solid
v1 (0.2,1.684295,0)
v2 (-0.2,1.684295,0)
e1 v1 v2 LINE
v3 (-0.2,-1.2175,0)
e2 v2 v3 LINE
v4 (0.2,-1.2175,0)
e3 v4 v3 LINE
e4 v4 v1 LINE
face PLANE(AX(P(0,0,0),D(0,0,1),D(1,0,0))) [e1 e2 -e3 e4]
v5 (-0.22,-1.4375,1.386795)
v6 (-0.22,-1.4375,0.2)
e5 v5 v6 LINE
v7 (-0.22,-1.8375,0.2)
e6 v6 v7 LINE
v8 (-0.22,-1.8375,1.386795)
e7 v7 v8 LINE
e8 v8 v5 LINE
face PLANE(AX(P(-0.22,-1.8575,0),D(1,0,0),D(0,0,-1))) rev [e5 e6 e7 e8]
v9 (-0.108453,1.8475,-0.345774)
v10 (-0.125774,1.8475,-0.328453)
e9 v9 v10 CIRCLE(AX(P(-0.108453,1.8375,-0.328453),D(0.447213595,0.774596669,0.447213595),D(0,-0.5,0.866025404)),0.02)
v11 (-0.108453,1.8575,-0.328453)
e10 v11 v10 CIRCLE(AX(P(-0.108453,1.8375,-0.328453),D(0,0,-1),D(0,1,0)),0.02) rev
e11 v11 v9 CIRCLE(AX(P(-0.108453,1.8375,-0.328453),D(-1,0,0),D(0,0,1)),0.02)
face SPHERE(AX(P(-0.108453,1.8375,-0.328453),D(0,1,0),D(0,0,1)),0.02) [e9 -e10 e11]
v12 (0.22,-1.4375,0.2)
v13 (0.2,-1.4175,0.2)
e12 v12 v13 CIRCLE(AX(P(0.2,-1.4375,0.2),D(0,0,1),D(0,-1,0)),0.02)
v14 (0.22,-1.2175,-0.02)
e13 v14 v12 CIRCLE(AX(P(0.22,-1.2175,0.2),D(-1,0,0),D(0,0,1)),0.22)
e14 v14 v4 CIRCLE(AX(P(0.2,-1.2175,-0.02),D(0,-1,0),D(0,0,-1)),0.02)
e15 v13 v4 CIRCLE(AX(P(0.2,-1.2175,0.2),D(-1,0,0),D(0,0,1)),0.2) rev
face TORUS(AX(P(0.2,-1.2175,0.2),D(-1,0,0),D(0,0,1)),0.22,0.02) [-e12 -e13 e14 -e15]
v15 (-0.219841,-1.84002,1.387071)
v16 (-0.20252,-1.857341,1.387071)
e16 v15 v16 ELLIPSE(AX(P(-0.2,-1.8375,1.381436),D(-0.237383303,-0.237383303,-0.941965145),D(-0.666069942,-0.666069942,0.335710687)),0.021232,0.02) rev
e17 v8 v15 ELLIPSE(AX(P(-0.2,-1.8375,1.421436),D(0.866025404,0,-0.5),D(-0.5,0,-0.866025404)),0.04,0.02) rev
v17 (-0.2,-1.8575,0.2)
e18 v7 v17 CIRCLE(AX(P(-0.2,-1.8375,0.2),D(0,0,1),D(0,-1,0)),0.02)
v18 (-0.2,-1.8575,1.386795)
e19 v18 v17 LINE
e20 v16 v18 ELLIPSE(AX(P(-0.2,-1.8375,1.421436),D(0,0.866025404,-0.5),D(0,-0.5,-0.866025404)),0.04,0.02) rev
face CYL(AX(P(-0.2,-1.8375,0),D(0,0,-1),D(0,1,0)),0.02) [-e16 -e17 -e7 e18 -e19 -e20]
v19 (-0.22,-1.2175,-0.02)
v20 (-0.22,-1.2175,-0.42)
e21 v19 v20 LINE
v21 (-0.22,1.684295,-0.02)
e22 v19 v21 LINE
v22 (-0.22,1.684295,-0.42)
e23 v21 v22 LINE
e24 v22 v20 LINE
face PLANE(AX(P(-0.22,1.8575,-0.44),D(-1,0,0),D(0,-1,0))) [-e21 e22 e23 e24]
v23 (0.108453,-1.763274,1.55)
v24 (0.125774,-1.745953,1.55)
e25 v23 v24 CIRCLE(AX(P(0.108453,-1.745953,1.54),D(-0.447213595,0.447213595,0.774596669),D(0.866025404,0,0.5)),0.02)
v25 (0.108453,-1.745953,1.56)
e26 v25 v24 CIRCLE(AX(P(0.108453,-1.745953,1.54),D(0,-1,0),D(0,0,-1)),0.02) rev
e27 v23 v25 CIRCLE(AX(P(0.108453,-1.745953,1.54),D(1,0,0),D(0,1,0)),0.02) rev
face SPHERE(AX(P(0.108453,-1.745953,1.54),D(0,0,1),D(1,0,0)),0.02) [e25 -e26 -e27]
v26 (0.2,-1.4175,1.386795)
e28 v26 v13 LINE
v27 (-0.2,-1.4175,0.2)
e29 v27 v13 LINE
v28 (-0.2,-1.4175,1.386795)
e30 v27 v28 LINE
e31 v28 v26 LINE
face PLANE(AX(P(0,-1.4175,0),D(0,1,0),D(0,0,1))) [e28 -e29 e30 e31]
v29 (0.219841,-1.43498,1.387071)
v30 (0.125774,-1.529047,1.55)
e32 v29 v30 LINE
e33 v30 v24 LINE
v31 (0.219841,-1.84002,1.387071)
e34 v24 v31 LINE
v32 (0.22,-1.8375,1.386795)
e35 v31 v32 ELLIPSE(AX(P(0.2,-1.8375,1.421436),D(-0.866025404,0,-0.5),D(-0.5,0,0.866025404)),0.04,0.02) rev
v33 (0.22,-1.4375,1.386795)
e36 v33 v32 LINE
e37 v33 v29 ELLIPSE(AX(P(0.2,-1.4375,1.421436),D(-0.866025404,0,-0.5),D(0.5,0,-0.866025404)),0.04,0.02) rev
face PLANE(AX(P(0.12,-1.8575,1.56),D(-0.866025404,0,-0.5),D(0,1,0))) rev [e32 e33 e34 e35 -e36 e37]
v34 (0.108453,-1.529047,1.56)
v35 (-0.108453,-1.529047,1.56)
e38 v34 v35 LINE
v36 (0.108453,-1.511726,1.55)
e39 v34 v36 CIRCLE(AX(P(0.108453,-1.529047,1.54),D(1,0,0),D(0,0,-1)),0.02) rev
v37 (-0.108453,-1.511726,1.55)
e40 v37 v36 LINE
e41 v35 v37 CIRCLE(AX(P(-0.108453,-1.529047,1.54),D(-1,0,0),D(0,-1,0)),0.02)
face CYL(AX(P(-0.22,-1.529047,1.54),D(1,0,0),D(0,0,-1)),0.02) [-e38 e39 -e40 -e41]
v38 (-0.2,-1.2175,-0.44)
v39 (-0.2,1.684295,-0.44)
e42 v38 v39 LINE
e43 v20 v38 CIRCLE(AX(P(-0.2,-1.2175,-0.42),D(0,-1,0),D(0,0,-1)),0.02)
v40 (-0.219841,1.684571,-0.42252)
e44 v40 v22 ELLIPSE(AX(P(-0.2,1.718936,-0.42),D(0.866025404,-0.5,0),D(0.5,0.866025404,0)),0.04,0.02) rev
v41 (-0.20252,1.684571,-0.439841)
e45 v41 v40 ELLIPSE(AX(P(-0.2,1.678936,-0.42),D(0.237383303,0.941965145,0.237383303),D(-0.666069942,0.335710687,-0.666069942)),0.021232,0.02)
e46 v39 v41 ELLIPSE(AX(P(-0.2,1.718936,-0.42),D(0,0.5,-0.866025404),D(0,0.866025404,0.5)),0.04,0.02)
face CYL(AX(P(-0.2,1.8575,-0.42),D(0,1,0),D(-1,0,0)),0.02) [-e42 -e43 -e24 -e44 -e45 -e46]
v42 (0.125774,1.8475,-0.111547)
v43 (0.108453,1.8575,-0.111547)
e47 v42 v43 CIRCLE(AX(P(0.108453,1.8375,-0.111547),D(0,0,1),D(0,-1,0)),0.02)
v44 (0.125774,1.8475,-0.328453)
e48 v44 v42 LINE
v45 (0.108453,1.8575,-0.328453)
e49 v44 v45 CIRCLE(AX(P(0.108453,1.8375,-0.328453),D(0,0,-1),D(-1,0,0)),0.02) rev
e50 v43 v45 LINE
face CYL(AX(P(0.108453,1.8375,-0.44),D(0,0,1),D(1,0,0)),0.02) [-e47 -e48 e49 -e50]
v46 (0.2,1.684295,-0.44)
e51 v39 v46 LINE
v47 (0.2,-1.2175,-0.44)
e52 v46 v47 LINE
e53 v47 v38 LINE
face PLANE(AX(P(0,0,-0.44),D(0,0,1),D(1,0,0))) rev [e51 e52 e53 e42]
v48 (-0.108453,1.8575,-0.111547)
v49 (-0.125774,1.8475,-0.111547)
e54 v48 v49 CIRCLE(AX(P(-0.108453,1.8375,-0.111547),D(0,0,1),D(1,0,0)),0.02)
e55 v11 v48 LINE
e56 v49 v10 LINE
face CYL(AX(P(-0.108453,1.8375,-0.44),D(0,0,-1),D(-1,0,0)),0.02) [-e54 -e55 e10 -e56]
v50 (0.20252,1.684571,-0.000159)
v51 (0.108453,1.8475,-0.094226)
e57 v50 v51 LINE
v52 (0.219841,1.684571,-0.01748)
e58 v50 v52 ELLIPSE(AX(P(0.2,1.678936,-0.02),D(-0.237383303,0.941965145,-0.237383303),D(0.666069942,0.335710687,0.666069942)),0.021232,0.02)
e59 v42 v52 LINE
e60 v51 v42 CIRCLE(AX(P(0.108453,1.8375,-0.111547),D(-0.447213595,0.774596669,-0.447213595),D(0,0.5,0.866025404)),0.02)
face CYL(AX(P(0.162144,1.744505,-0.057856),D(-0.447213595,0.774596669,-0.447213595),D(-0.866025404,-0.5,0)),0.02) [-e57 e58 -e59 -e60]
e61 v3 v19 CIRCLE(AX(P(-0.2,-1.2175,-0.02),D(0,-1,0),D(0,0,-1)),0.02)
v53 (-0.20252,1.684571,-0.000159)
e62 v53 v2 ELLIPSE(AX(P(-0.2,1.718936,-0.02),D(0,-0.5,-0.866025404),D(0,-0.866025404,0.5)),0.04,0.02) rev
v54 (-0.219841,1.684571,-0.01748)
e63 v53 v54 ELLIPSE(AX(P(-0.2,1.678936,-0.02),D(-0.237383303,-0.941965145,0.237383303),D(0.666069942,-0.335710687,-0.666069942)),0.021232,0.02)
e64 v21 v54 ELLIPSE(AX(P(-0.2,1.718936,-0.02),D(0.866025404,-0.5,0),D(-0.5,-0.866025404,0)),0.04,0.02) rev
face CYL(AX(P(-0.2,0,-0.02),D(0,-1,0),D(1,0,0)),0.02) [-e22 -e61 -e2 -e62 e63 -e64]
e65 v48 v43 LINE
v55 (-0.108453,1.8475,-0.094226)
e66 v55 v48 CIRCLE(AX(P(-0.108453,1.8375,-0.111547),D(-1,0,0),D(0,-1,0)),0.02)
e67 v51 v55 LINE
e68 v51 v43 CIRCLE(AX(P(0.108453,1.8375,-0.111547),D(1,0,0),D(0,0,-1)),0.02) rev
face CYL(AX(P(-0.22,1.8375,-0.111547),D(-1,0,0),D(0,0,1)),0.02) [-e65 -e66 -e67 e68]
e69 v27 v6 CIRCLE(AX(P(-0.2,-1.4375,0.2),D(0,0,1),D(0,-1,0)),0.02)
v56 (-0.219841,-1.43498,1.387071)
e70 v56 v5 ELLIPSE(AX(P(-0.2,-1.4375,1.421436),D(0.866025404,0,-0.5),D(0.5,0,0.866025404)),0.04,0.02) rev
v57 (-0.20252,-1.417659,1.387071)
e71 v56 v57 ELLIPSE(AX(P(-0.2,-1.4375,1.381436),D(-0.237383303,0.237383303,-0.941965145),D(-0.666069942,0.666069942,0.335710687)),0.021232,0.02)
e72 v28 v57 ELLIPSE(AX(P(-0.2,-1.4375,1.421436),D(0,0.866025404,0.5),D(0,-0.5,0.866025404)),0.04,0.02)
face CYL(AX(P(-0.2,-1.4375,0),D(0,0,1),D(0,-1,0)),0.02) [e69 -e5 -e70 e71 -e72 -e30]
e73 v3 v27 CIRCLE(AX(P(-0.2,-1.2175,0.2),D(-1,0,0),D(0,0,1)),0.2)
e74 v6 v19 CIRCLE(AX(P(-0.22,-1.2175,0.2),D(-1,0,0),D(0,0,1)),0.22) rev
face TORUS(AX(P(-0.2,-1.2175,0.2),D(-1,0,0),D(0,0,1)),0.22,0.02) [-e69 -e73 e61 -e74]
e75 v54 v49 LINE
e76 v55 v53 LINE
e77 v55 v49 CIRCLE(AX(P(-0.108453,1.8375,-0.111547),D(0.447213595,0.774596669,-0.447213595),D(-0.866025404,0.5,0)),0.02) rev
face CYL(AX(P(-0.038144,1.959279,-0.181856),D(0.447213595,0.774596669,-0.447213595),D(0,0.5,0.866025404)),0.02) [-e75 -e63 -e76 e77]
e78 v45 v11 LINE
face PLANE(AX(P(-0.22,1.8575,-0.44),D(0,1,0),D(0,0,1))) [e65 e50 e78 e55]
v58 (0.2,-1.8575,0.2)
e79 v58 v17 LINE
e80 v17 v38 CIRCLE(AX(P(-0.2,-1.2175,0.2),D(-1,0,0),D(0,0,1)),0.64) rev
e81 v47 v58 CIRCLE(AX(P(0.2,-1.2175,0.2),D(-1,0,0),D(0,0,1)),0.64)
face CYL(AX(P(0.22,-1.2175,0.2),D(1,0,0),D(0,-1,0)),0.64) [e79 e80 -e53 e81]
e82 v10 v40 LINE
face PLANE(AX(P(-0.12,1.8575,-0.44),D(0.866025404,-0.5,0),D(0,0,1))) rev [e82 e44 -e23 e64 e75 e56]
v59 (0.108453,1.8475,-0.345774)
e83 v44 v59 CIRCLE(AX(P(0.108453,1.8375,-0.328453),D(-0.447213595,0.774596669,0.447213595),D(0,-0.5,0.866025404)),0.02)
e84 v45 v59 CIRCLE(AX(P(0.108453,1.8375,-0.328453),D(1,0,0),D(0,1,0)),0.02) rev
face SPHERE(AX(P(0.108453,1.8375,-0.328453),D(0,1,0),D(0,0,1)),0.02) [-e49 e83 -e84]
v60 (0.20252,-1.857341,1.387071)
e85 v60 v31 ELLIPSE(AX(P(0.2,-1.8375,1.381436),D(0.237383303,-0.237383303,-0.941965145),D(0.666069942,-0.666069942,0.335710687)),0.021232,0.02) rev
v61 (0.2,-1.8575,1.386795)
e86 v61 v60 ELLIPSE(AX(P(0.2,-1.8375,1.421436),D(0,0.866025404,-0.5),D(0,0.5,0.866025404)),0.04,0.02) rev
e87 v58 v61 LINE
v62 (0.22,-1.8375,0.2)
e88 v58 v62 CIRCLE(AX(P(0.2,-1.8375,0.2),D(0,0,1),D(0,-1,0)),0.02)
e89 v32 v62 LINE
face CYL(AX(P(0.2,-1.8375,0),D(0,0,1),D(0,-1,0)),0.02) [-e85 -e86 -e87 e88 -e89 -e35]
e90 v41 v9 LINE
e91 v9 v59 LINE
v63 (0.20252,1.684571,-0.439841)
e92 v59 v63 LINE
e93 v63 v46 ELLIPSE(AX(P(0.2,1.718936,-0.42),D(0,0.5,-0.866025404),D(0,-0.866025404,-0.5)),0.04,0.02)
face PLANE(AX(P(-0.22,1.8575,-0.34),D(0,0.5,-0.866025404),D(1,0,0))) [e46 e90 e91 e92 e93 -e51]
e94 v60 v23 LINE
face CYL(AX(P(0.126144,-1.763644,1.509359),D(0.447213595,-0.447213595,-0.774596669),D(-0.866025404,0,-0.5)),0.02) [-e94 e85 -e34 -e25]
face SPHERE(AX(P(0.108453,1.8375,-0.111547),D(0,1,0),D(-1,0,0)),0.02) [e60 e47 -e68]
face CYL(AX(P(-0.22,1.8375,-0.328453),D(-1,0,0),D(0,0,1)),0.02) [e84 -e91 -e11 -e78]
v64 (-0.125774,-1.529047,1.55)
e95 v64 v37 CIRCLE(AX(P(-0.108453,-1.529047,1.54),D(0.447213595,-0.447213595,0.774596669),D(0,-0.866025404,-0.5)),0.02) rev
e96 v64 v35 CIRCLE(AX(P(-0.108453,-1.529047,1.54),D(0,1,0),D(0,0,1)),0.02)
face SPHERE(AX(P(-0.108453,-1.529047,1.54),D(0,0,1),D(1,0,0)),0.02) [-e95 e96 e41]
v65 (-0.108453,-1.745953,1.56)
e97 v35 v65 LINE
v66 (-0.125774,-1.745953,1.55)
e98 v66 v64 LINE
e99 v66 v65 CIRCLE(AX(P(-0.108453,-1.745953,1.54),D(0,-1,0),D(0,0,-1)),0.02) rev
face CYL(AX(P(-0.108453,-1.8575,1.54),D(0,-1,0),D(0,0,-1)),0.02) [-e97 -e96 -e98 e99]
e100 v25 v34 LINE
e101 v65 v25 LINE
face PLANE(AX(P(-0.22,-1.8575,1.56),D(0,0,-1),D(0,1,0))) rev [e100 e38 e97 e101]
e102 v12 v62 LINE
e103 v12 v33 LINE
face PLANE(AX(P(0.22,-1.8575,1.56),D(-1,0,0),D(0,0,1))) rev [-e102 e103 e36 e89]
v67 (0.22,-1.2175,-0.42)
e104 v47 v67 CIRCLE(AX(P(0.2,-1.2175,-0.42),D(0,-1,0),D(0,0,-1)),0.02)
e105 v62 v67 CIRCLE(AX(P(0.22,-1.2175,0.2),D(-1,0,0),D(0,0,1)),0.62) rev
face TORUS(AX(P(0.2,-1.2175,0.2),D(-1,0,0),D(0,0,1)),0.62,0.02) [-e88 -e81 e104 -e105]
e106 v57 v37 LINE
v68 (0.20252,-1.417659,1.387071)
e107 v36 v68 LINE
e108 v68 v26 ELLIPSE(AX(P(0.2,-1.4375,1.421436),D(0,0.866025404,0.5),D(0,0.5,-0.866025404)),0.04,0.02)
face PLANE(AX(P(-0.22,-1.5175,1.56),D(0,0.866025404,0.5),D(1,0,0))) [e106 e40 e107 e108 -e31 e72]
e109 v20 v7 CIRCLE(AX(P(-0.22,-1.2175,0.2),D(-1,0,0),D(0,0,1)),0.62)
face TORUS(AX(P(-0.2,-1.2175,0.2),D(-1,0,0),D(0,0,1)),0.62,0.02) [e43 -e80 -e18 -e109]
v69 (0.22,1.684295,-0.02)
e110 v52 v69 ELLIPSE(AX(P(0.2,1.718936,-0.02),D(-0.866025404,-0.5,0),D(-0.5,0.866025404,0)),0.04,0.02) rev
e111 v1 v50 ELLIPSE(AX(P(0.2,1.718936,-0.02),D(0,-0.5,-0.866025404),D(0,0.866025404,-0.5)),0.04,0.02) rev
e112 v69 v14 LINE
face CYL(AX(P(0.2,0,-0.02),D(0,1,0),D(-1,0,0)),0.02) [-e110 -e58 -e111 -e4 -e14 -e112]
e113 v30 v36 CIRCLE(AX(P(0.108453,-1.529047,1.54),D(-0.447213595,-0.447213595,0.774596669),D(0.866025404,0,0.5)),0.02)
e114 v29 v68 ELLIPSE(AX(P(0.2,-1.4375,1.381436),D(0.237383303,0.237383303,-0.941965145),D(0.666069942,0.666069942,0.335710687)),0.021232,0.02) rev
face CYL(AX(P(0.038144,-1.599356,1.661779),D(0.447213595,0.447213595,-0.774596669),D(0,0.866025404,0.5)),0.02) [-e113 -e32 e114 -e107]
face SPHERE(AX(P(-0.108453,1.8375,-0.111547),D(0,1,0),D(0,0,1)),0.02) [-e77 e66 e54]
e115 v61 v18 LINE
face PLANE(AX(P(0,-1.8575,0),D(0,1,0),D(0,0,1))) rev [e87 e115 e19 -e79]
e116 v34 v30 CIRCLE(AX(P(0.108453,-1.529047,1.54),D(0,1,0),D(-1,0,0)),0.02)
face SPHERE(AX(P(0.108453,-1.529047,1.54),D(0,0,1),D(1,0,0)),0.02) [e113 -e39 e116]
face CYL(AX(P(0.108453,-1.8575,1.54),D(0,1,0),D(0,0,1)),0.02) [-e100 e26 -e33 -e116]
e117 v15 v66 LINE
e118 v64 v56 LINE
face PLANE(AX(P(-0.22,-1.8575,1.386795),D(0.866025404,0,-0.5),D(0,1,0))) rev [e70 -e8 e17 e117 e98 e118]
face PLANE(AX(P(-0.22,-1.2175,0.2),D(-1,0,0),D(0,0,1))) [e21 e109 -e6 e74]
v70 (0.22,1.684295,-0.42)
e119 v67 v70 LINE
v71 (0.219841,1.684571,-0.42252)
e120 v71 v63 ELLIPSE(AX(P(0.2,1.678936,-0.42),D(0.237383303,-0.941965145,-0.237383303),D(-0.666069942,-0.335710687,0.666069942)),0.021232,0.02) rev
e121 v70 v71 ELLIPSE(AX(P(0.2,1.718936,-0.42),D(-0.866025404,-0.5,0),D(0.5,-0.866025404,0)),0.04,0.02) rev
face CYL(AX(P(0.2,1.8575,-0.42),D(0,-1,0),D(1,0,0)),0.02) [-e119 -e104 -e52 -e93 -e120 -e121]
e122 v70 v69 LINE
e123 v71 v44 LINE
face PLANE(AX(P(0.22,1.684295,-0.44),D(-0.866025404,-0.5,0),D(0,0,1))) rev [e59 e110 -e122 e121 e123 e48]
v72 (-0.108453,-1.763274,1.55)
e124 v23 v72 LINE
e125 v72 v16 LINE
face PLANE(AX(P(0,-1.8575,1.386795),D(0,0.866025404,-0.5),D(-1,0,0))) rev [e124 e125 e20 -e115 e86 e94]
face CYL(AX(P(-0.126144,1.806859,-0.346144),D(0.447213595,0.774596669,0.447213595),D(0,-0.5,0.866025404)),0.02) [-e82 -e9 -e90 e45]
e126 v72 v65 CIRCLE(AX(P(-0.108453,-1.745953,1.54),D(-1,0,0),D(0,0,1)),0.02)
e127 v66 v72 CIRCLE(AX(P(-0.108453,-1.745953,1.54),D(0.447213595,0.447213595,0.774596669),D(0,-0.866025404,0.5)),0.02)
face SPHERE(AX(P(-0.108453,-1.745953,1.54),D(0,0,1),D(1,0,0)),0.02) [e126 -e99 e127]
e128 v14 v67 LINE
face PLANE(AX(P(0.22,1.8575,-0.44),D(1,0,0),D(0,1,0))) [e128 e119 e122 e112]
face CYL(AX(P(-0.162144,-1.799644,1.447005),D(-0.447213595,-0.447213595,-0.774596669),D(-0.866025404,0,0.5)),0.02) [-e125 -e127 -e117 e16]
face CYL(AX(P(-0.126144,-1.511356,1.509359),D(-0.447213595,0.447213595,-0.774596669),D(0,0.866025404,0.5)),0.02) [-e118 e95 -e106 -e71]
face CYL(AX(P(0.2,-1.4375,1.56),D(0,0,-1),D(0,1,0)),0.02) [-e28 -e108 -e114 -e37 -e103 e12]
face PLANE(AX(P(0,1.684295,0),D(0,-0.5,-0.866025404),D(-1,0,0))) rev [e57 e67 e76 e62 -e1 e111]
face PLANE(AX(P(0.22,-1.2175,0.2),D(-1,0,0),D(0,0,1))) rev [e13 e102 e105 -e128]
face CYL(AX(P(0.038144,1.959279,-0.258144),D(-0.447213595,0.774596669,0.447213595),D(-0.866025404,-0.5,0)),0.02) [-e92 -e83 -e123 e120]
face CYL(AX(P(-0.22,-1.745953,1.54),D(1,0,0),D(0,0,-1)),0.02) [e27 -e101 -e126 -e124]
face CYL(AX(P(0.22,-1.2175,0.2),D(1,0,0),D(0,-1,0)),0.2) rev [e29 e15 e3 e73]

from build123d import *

# Parameters (mm, degrees)
SKETCH2_W                        = 0.44
SKETCH2_H                        = 3.715
BASE_FLANGE1_DEPTH               = 0.44
SM_EDGE_FLANGE_1_STRIP_W         = 2.16
SM_EDGE_FLANGE_1_STRIP_H         = 0.44
SM_EDGE_FLANGE_1_STRIP_CUT_DEPTH = 0.44
SM_EDGE_FLANGE_1_DEPTH           = 0.44
CHAMFER2_SIZE                    = 0.1
CHAMFER2_SIZE2                   = 0.173205081
CHAMFER3_SIZE                    = 0.1
CHAMFER3_SIZE2                   = 0.173205081
FILLET1_R                        = 0.02


# Sheet-metal steps are written as plain solids
with BuildPart() as part:
    # Base-Flange1: sheet metal written as solids
    # Sketch2 → Base-Flange1 (new body)
    with BuildSketch(Plane.XY):
        Rectangle(SKETCH2_W, SKETCH2_H)
    extrude(amount=-BASE_FLANGE1_DEPTH)

    # 边线-法兰1: sheet metal written as solids
    # 边线-法兰1 strip (on a plane across the edge) → 边线-法兰1 strip cut (cut)
    with BuildSketch(Plane(origin=(-0.22, -1.8575, 0), x_dir=(0, 1, 0), z_dir=(1, 0, 0))):
        with Locations((-0.44, -0.22)):
            Rectangle(SM_EDGE_FLANGE_1_STRIP_W, SM_EDGE_FLANGE_1_STRIP_H)
    extrude(amount=SM_EDGE_FLANGE_1_STRIP_CUT_DEPTH, mode=Mode.SUBTRACT)

    # 边线-法兰1 section (on a plane across the edge) → 边线-法兰1 (add)
    with BuildSketch(Plane(origin=(-0.22, -1.8575, 0), x_dir=(0, 1, 0), z_dir=(1, 0, 0))):
        with BuildLine():
            Line((0, 0.2), (0, 1.56))
            Line((0, 1.56), (0.44, 1.56))
            Line((0.44, 1.56), (0.44, 0.2))
            ThreePointArc((0.44, 0.2), (0.498578644, 0.058578644), (0.64, 0))
            Line((0.64, 0), (0.64, -0.44))
            ThreePointArc((0.64, -0.44), (0.18745166, -0.25254834), (0, 0.2))
        make_face()
    extrude(amount=SM_EDGE_FLANGE_1_DEPTH)

    # Chamfer2
    chamfer2_edges = [part.edges().sort_by_distance(p)[0] for p in [
        (0, 1.8575, 0),
        (-0.22, 1.8575, -0.22),
        (0.22, 1.8575, -0.22),
        (0, 1.8575, -0.44),
    ]]
    chamfer2_side = [part.faces().sort_by_distance(p)[0] for p in [
        (0, 1.8575, -0.22),
    ]]
    chamfer(chamfer2_edges, length=CHAMFER2_SIZE, length2=CHAMFER2_SIZE2, reference=chamfer2_side[0])

    # Chamfer3
    chamfer3_edges = [part.edges().sort_by_distance(p)[0] for p in [
        (-0.22, -1.6375, 1.56),
        (0, -1.8575, 1.56),
        (0, -1.4175, 1.56),
        (0.22, -1.6375, 1.56),
    ]]
    chamfer3_side = [part.faces().sort_by_distance(p)[0] for p in [
        (0, -1.6375, 1.56),
    ]]
    chamfer(chamfer3_edges, length=CHAMFER3_SIZE, length2=CHAMFER3_SIZE2, reference=chamfer3_side[0])

    # Fillet1
    # the kernel refuses this fillet: 0.02 mm, written as the material it takes off along each edge
    with BuildSketch(Plane(origin=(-0.108452995, 1.8375, -0.111547005), x_dir=(0.8320502943378433, 0.48038446141526264, -0.27735009811261363), z_dir=(-0.36927447293799925, 0.8528028654224409, 0.3692744729379992))) as fillet1_piece_1_section:
        Polygon((-0.030983867, -0.030983867), (0.030983867, -0.030983867), (0.030983867, 0.030983867), (-0.030983867, 0.030983867), align=None)
    fillet1_piece_1 = extrude(amount=0.030983867, mode=Mode.PRIVATE)
    fillet1_piece_1 = split(fillet1_piece_1, bisect_by=Plane(origin=(-0.108452995, 1.8375, -0.111547005), z_dir=(-1, 0, 0)), keep=Keep.TOP, mode=Mode.PRIVATE)
    fillet1_piece_1 = split(fillet1_piece_1, bisect_by=Plane(origin=(-0.108452995, 1.8375, -0.111547005), z_dir=(0, 0, 1)), keep=Keep.TOP, mode=Mode.PRIVATE)
    fillet1_piece_1 = split(fillet1_piece_1, bisect_by=Plane(origin=(-0.108452995, 1.8375, -0.111547005), z_dir=(0.4472135954999562, 0.7745966692414853, -0.4472135954999563)), keep=Keep.TOP, mode=Mode.PRIVATE)
    fillet1_piece_1 = split(fillet1_piece_1, bisect_by=Plane(origin=(-0.108452995, 1.8475, -0.094226497), z_dir=(0, -0.4999999999999977, -0.8660254037844399)), keep=Keep.TOP, mode=Mode.PRIVATE)
    fillet1_piece_1 = split(fillet1_piece_1, bisect_by=Plane(origin=(-0.108452995, 1.8575, -0.111547005), z_dir=(0, -1, 0)), keep=Keep.TOP, mode=Mode.PRIVATE)
    fillet1_piece_1 = split(fillet1_piece_1, bisect_by=Plane(origin=(-0.125773503, 1.8475, -0.111547005), z_dir=(0.86602540378444, -0.4999999999999976, 0)), keep=Keep.TOP, mode=Mode.PRIVATE)
    fillet1_piece_1 = fillet1_piece_1 - Plane(origin=(-0.108452995, 1.8375, -0.111547005), x_dir=(0.36927447293799925, -0.8528028654224409, -0.3692744729379992), z_dir=(0.8320502943378433, 0.48038446141526264, -0.27735009811261363)) * Sphere(FILLET1_R, mode=Mode.PRIVATE)
    add(fillet1_piece_1, mode=Mode.SUBTRACT)
    with BuildSketch(Plane(origin=(0.108452995, 1.8375, -0.111547005), x_dir=(-0.27735009811261363, 0.48038446141526264, -0.8320502943378434), z_dir=(0.36927447293799914, 0.8528028654224408, 0.36927447293799914))) as fillet1_piece_2_section:
        Polygon((-0.030983867, -0.030983867), (0.030983867, -0.030983867), (0.030983867, 0.030983867), (-0.030983867, 0.030983867), align=None)
    fillet1_piece_2 = extrude(amount=0.030983867, mode=Mode.PRIVATE)
    fillet1_piece_2 = split(fillet1_piece_2, bisect_by=Plane(origin=(0.108452995, 1.8375, -0.111547005), z_dir=(-0.4472135954999564, 0.7745966692414853, -0.4472135954999563)), keep=Keep.TOP, mode=Mode.PRIVATE)
    fillet1_piece_2 = split(fillet1_piece_2, bisect_by=Plane(origin=(0.108452995, 1.8375, -0.111547005), z_dir=(1, 0, 0)), keep=Keep.TOP, mode=Mode.PRIVATE)
    fillet1_piece_2 = split(fillet1_piece_2, bisect_by=Plane(origin=(0.108452995, 1.8375, -0.111547005), z_dir=(0, 0, 1)), keep=Keep.TOP, mode=Mode.PRIVATE)
    fillet1_piece_2 = split(fillet1_piece_2, bisect_by=Plane(origin=(0.125773503, 1.8475, -0.111547005), z_dir=(-0.8660254037844399, -0.4999999999999978, 0)), keep=Keep.TOP, mode=Mode.PRIVATE)
    fillet1_piece_2 = split(fillet1_piece_2, bisect_by=Plane(origin=(0.108452995, 1.8475, -0.094226497), z_dir=(0, -0.4999999999999977, -0.8660254037844399)), keep=Keep.TOP, mode=Mode.PRIVATE)
    fillet1_piece_2 = split(fillet1_piece_2, bisect_by=Plane(origin=(0.108452995, 1.8575, -0.111547005), z_dir=(0, -1, 0)), keep=Keep.TOP, mode=Mode.PRIVATE)
    fillet1_piece_2 = fillet1_piece_2 - Plane(origin=(0.108452995, 1.8375, -0.111547005), x_dir=(-0.36927447293799914, -0.8528028654224408, -0.36927447293799914), z_dir=(-0.27735009811261363, 0.48038446141526264, -0.8320502943378434)) * Sphere(FILLET1_R, mode=Mode.PRIVATE)
    add(fillet1_piece_2, mode=Mode.SUBTRACT)
    with BuildSketch(Plane(origin=(0.108452995, 1.8375, -0.328452995), x_dir=(0.27735009811261363, -0.48038446141526264, -0.8320502943378434), z_dir=(0.36927447293799914, 0.8528028654224408, -0.36927447293799914))) as fillet1_piece_3_section:
        Polygon((-0.030983867, -0.030983867), (0.030983867, -0.030983867), (0.030983867, 0.030983867), (-0.030983867, 0.030983867), align=None)
    fillet1_piece_3 = extrude(amount=0.030983867, mode=Mode.PRIVATE)
    fillet1_piece_3 = split(fillet1_piece_3, bisect_by=Plane(origin=(0.108452995, 1.8375, -0.328452995), z_dir=(0, 0, -1)), keep=Keep.TOP, mode=Mode.PRIVATE)
    fillet1_piece_3 = split(fillet1_piece_3, bisect_by=Plane(origin=(0.108452995, 1.8375, -0.328452995), z_dir=(1, 0, 0)), keep=Keep.TOP, mode=Mode.PRIVATE)
    fillet1_piece_3 = split(fillet1_piece_3, bisect_by=Plane(origin=(0.108452995, 1.8375, -0.328452995), z_dir=(-0.4472135954999563, 0.7745966692414852, 0.4472135954999564)), keep=Keep.TOP, mode=Mode.PRIVATE)
    fillet1_piece_3 = split(fillet1_piece_3, bisect_by=Plane(origin=(0.125773503, 1.8475, -0.328452995), z_dir=(-0.8660254037844399, -0.4999999999999978, 0)), keep=Keep.TOP, mode=Mode.PRIVATE)
    fillet1_piece_3 = split(fillet1_piece_3, bisect_by=Plane(origin=(0.108452995, 1.8575, -0.328452995), z_dir=(0, -1, 0)), keep=Keep.TOP, mode=Mode.PRIVATE)
    fillet1_piece_3 = split(fillet1_piece_3, bisect_by=Plane(origin=(0.108452995, 1.8475, -0.345773503), z_dir=(0, -0.49999999999999784, 0.8660254037844399)), keep=Keep.TOP, mode=Mode.PRIVATE)
    fillet1_piece_3 = fillet1_piece_3 - Plane(origin=(0.108452995, 1.8375, -0.328452995), x_dir=(-0.36927447293799914, -0.8528028654224408, 0.36927447293799914), z_dir=(0.27735009811261363, -0.48038446141526264, -0.8320502943378434)) * Sphere(FILLET1_R, mode=Mode.PRIVATE)
    add(fillet1_piece_3, mode=Mode.SUBTRACT)
    with BuildSketch(Plane(origin=(-0.108452995, 1.8375, -0.328452995), x_dir=(0.2773500981126135, 0.48038446141526264, 0.8320502943378434), z_dir=(-0.36927447293799925, 0.8528028654224409, -0.3692744729379992))) as fillet1_piece_4_section:
        Polygon((-0.030983867, -0.030983867), (0.030983867, -0.030983867), (0.030983867, 0.030983867), (-0.030983867, 0.030983867), align=None)
    fillet1_piece_4 = extrude(amount=0.030983867, mode=Mode.PRIVATE)
    fillet1_piece_4 = split(fillet1_piece_4, bisect_by=Plane(origin=(-0.108452995, 1.8375, -0.328452995), z_dir=(0, 0, -1)), keep=Keep.TOP, mode=Mode.PRIVATE)
    fillet1_piece_4 = split(fillet1_piece_4, bisect_by=Plane(origin=(-0.108452995, 1.8375, -0.328452995), z_dir=(-1, 0, 0)), keep=Keep.TOP, mode=Mode.PRIVATE)
    fillet1_piece_4 = split(fillet1_piece_4, bisect_by=Plane(origin=(-0.108452995, 1.8375, -0.328452995), z_dir=(0.44721359549995615, 0.7745966692414852, 0.4472135954999564)), keep=Keep.TOP, mode=Mode.PRIVATE)
    fillet1_piece_4 = split(fillet1_piece_4, bisect_by=Plane(origin=(-0.125773503, 1.8475, -0.328452995), z_dir=(0.86602540378444, -0.4999999999999976, 0)), keep=Keep.TOP, mode=Mode.PRIVATE)
    fillet1_piece_4 = split(fillet1_piece_4, bisect_by=Plane(origin=(-0.108452995, 1.8575, -0.328452995), z_dir=(0, -1, 0)), keep=Keep.TOP, mode=Mode.PRIVATE)
    fillet1_piece_4 = split(fillet1_piece_4, bisect_by=Plane(origin=(-0.108452995, 1.8475, -0.345773503), z_dir=(0, -0.49999999999999784, 0.8660254037844399)), keep=Keep.TOP, mode=Mode.PRIVATE)
    fillet1_piece_4 = fillet1_piece_4 - Plane(origin=(-0.108452995, 1.8375, -0.328452995), x_dir=(0.36927447293799925, -0.8528028654224409, 0.3692744729379992), z_dir=(0.2773500981126135, 0.48038446141526264, 0.8320502943378434)) * Sphere(FILLET1_R, mode=Mode.PRIVATE)
    add(fillet1_piece_4, mode=Mode.SUBTRACT)
    with BuildSketch(Plane(origin=(-0.108452995, -1.529047005, 1.54), x_dir=(-0.8320502943378433, 0.27735009811261585, -0.48038446141526164), z_dir=(-0.3692744729379991, 0.3692744729379959, 0.8528028654224422))) as fillet1_piece_5_section:
        Polygon((-0.030983867, -0.030983867), (0.030983867, -0.030983867), (0.030983867, 0.030983867), (-0.030983867, 0.030983867), align=None)
    fillet1_piece_5 = extrude(amount=0.030983867, mode=Mode.PRIVATE)
    fillet1_piece_5 = split(fillet1_piece_5, bisect_by=Plane(origin=(-0.108452995, -1.529047005, 1.54), z_dir=(0.44721359549995615, -0.4472135954999597, 0.7745966692414834)), keep=Keep.TOP, mode=Mode.PRIVATE)
    fillet1_piece_5 = split(fillet1_piece_5, bisect_by=Plane(origin=(-0.108452995, -1.529047005, 1.54), z_dir=(0, 1, 0)), keep=Keep.TOP, mode=Mode.PRIVATE)
    fillet1_piece_5 = split(fillet1_piece_5, bisect_by=Plane(origin=(-0.108452995, -1.529047005, 1.54), z_dir=(-1, 0, 0)), keep=Keep.TOP, mode=Mode.PRIVATE)
    fillet1_piece_5 = split(fillet1_piece_5, bisect_by=Plane(origin=(-0.108452995, -1.511726497, 1.55), z_dir=(0, -0.8660254037844378, -0.5000000000000016)), keep=Keep.TOP, mode=Mode.PRIVATE)
    fillet1_piece_5 = split(fillet1_piece_5, bisect_by=Plane(origin=(-0.125773503, -1.529047005, 1.55), z_dir=(0.8660254037844399, 1.8461148906874763e-15, -0.4999999999999977)), keep=Keep.TOP, mode=Mode.PRIVATE)
    fillet1_piece_5 = split(fillet1_piece_5, bisect_by=Plane(origin=(-0.108452995, -1.529047005, 1.56), z_dir=(0, 0, -1)), keep=Keep.TOP, mode=Mode.PRIVATE)
    fillet1_piece_5 = fillet1_piece_5 - Plane(origin=(-0.108452995, -1.529047005, 1.54), x_dir=(0.3692744729379991, -0.3692744729379959, -0.8528028654224422), z_dir=(-0.8320502943378433, 0.27735009811261585, -0.48038446141526164)) * Sphere(FILLET1_R, mode=Mode.PRIVATE)
    add(fillet1_piece_5, mode=Mode.SUBTRACT)
    with BuildSketch(Plane(origin=(0.108452995, -1.529047005, 1.54), x_dir=(0.27735009811261335, 0.8320502943378454, -0.4803844614152595), z_dir=(0.3692744729379991, 0.369274472937996, 0.8528028654224422))) as fillet1_piece_6_section:
        Polygon((-0.030983867, -0.030983867), (0.030983867, -0.030983867), (0.030983867, 0.030983867), (-0.030983867, 0.030983867), align=None)
    fillet1_piece_6 = extrude(amount=0.030983867, mode=Mode.PRIVATE)
    fillet1_piece_6 = split(fillet1_piece_6, bisect_by=Plane(origin=(0.108452995, -1.529047005, 1.54), z_dir=(-0.4472135954999561, -0.44721359549995976, 0.7745966692414834)), keep=Keep.TOP, mode=Mode.PRIVATE)
    fillet1_piece_6 = split(fillet1_piece_6, bisect_by=Plane(origin=(0.108452995, -1.529047005, 1.54), z_dir=(1, 0, 0)), keep=Keep.TOP, mode=Mode.PRIVATE)
    fillet1_piece_6 = split(fillet1_piece_6, bisect_by=Plane(origin=(0.108452995, -1.529047005, 1.54), z_dir=(0, 1, 0)), keep=Keep.TOP, mode=Mode.PRIVATE)
    fillet1_piece_6 = split(fillet1_piece_6, bisect_by=Plane(origin=(0.125773503, -1.529047005, 1.55), z_dir=(-0.8660254037844399, 1.6396415147553242e-15, -0.4999999999999977)), keep=Keep.TOP, mode=Mode.PRIVATE)
    fillet1_piece_6 = split(fillet1_piece_6, bisect_by=Plane(origin=(0.108452995, -1.511726497, 1.55), z_dir=(0, -0.8660254037844378, -0.5000000000000016)), keep=Keep.TOP, mode=Mode.PRIVATE)
    fillet1_piece_6 = split(fillet1_piece_6, bisect_by=Plane(origin=(0.108452995, -1.529047005, 1.56), z_dir=(0, 0, -1)), keep=Keep.TOP, mode=Mode.PRIVATE)
    fillet1_piece_6 = fillet1_piece_6 - Plane(origin=(0.108452995, -1.529047005, 1.54), x_dir=(-0.3692744729379991, -0.369274472937996, -0.8528028654224422), z_dir=(0.27735009811261335, 0.8320502943378454, -0.4803844614152595)) * Sphere(FILLET1_R, mode=Mode.PRIVATE)
    add(fillet1_piece_6, mode=Mode.SUBTRACT)
    with BuildSketch(Plane(origin=(-0.108452995, -1.745952995, 1.54), x_dir=(-0.2773500981126135, -0.8320502943378416, -0.4803844614152656), z_dir=(-0.3692744729379992, -0.3692744729380023, 0.8528028654224395))) as fillet1_piece_7_section:
        Polygon((-0.030983867, -0.030983867), (0.030983867, -0.030983867), (0.030983867, 0.030983867), (-0.030983867, 0.030983867), align=None)
    fillet1_piece_7 = extrude(amount=0.030983867, mode=Mode.PRIVATE)
    fillet1_piece_7 = split(fillet1_piece_7, bisect_by=Plane(origin=(-0.108452995, -1.745952995, 1.54), z_dir=(0.44721359549995626, 0.44721359549995343, 0.774596669241487)), keep=Keep.TOP, mode=Mode.PRIVATE)
    fillet1_piece_7 = split(fillet1_piece_7, bisect_by=Plane(origin=(-0.108452995, -1.745952995, 1.54), z_dir=(-1, 0, 0)), keep=Keep.TOP, mode=Mode.PRIVATE)
    fillet1_piece_7 = split(fillet1_piece_7, bisect_by=Plane(origin=(-0.108452995, -1.745952995, 1.54), z_dir=(0, -1, 0)), keep=Keep.TOP, mode=Mode.PRIVATE)
    fillet1_piece_7 = split(fillet1_piece_7, bisect_by=Plane(origin=(-0.125773503, -1.745952995, 1.55), z_dir=(0.8660254037844399, 1.8461148906874763e-15, -0.4999999999999977)), keep=Keep.TOP, mode=Mode.PRIVATE)
    fillet1_piece_7 = split(fillet1_piece_7, bisect_by=Plane(origin=(-0.108452995, -1.763273503, 1.55), z_dir=(0, 0.8660254037844418, -0.49999999999999456)), keep=Keep.TOP, mode=Mode.PRIVATE)
    fillet1_piece_7 = split(fillet1_piece_7, bisect_by=Plane(origin=(-0.108452995, -1.745952995, 1.56), z_dir=(0, 0, -1)), keep=Keep.TOP, mode=Mode.PRIVATE)
    fillet1_piece_7 = fillet1_piece_7 - Plane(origin=(-0.108452995, -1.745952995, 1.54), x_dir=(0.3692744729379992, 0.3692744729380023, -0.8528028654224395), z_dir=(-0.2773500981126135, -0.8320502943378416, -0.4803844614152656)) * Sphere(FILLET1_R, mode=Mode.PRIVATE)
    add(fillet1_piece_7, mode=Mode.SUBTRACT)
    with BuildSketch(Plane(origin=(0.108452995, -1.745952995, 1.54), x_dir=(-0.27735009811261374, 0.8320502943378416, 0.4803844614152656), z_dir=(0.3692744729379992, -0.3692744729380022, 0.8528028654224395))) as fillet1_piece_8_section:
        Polygon((-0.030983867, -0.030983867), (0.030983867, -0.030983867), (0.030983867, 0.030983867), (-0.030983867, 0.030983867), align=None)
    fillet1_piece_8 = extrude(amount=0.030983867, mode=Mode.PRIVATE)
    fillet1_piece_8 = split(fillet1_piece_8, bisect_by=Plane(origin=(0.108452995, -1.745952995, 1.54), z_dir=(-0.4472135954999564, 0.44721359549995343, 0.774596669241487)), keep=Keep.TOP, mode=Mode.PRIVATE)
    fillet1_piece_8 = split(fillet1_piece_8, bisect_by=Plane(origin=(0.108452995, -1.745952995, 1.54), z_dir=(1, 0, 0)), keep=Keep.TOP, mode=Mode.PRIVATE)
    fillet1_piece_8 = split(fillet1_piece_8, bisect_by=Plane(origin=(0.108452995, -1.745952995, 1.54), z_dir=(0, -1, 0)), keep=Keep.TOP, mode=Mode.PRIVATE)
    fillet1_piece_8 = split(fillet1_piece_8, bisect_by=Plane(origin=(0.125773503, -1.745952995, 1.55), z_dir=(-0.8660254037844399, 1.6396415147553242e-15, -0.4999999999999977)), keep=Keep.TOP, mode=Mode.PRIVATE)
    fillet1_piece_8 = split(fillet1_piece_8, bisect_by=Plane(origin=(0.108452995, -1.763273503, 1.55), z_dir=(0, 0.8660254037844418, -0.49999999999999456)), keep=Keep.TOP, mode=Mode.PRIVATE)
    fillet1_piece_8 = split(fillet1_piece_8, bisect_by=Plane(origin=(0.108452995, -1.745952995, 1.56), z_dir=(0, 0, -1)), keep=Keep.TOP, mode=Mode.PRIVATE)
    fillet1_piece_8 = fillet1_piece_8 - Plane(origin=(0.108452995, -1.745952995, 1.54), x_dir=(-0.3692744729379992, 0.3692744729380022, -0.8528028654224395), z_dir=(-0.27735009811261374, 0.8320502943378416, 0.4803844614152656)) * Sphere(FILLET1_R, mode=Mode.PRIVATE)
    add(fillet1_piece_8, mode=Mode.SUBTRACT)
    with BuildSketch(Plane(origin=(0.22, 1.734294919, 0), x_dir=(-1, 0, 0), z_dir=(0, -1, 0)), Plane(origin=(-0.22, -1.2175, -0.44), x_dir=(0, 0, 1), z_dir=(0, 1, 0))) as fillet1_piece_9:
        with BuildLine():
            CenterArc((FILLET1_R, FILLET1_R), FILLET1_R, 180, 90)
            Line((0, FILLET1_R), (0, 0))
            Line((0, 0), (FILLET1_R, 0))
        make_face()
    extrude(amount=2.951794919, mode=Mode.SUBTRACT)
    with BuildSketch(Plane(origin=(0.22, 1.734294919, -0.44), x_dir=(-1, 0, 0), z_dir=(0, -1, 0)), Plane(origin=(-0.22, -1.2175, 0), x_dir=(0, 0, -1), z_dir=(0, 1, 0))) as fillet1_piece_10:
        with BuildLine():
            CenterArc((FILLET1_R, -FILLET1_R), FILLET1_R, 90, 90)
            Line((0, -FILLET1_R), (0, 0))
            Line((0, 0), (FILLET1_R, 0))
        make_face()
    extrude(amount=2.951794919, mode=Mode.SUBTRACT)
    with BuildSketch(Plane(origin=(-0.22, -1.2175, 0.2), x_dir=(0, 0, -1), z_dir=(0, 1, 0))) as fillet1_piece_11:
        with BuildLine():
            CenterArc((0.64 - FILLET1_R, -FILLET1_R), FILLET1_R, 360, 90)
            Line((0.64, -FILLET1_R), (0.64, 0))
            Line((0.64, 0), (0.64 - FILLET1_R, 0))
        make_face()
    revolve(axis=Axis((-0.22, -1.2175, 0.2), (-1, 0, 0)), revolution_arc=90, mode=Mode.SUBTRACT)
    with BuildSketch(Plane(origin=(0.22, -1.2175, 0.2), x_dir=(0, 0, -1), z_dir=(0, 1, 0))) as fillet1_piece_12:
        with BuildLine():
            CenterArc((0.64 - FILLET1_R, FILLET1_R), FILLET1_R, 270, 90)
            Line((0.64 - FILLET1_R, 0), (0.64, 0))
            Line((0.64, 0), (0.64, FILLET1_R))
        make_face()
    revolve(axis=Axis((0.22, -1.2175, 0.2), (-1, 0, 0)), revolution_arc=90, mode=Mode.SUBTRACT)
    with BuildSketch(Plane(origin=(-0.22, -1.2175, 0.2), x_dir=(0, -1, 0), z_dir=(0, 0, 1))) as fillet1_piece_13:
        with BuildLine():
            CenterArc((0.2 + FILLET1_R, FILLET1_R), FILLET1_R, 180, 90)
            Line((0.2, FILLET1_R), (0.2, 0))
            Line((0.2, 0), (0.2 + FILLET1_R, 0))
        make_face()
    revolve(axis=Axis((-0.22, -1.2175, 0.2), (1, 0, 0)), revolution_arc=90, mode=Mode.SUBTRACT)
    with BuildSketch(Plane(origin=(0.22, -1.2175, 0.2), x_dir=(0, -1, 0), z_dir=(0, 0, 1))) as fillet1_piece_14:
        with BuildLine():
            CenterArc((0.2 + FILLET1_R, -FILLET1_R), FILLET1_R, 90, 90)
            Line((0.2 + FILLET1_R, 0), (0.2, 0))
            Line((0.2, 0), (0.2, -FILLET1_R))
        make_face()
    revolve(axis=Axis((0.22, -1.2175, 0.2), (1, 0, 0)), revolution_arc=90, mode=Mode.SUBTRACT)
    with BuildSketch(Plane(origin=(0.22, -1.4175, 1.436794919), x_dir=(-1, 0, 0), z_dir=(0, 0, -1)), Plane(origin=(0.22, -1.8575, 0.2), x_dir=(-1, 0, 0), z_dir=(0, 0, 1)), Plane(origin=(-0.22, -1.8575, 0.2), x_dir=(0, 1, 0), z_dir=(0, 0, 1)), Plane(origin=(-0.22, -1.4175, 1.436794919), x_dir=(0, -1, 0), z_dir=(0, 0, -1))) as fillet1_piece_15:
        with BuildLine():
            CenterArc((FILLET1_R, -FILLET1_R), FILLET1_R, 90, 90)
            Line((0, -FILLET1_R), (0, 0))
            Line((0, 0), (FILLET1_R, 0))
        make_face()
    extrude(amount=1.236794919, mode=Mode.SUBTRACT)
    with BuildSketch(Plane(origin=(-0.108452995, 1.8575, -0.1), x_dir=(0, -0.8660254037844376, 0.500000000000002), z_dir=(1, 0, 0)), Plane(origin=(-0.108452995, 1.8575, -0.34), x_dir=(0, 0, 1), z_dir=(1, 0, 0)), Plane(origin=(-0.108452995, -1.7575, 1.56), x_dir=(0, -0.49999999999999795, -0.8660254037844398), z_dir=(1, 0, 0))) as fillet1_piece_16:
        with BuildLine():
            CenterArc((FILLET1_R * 0.57735026919, FILLET1_R), FILLET1_R, 210, 60)
            Line((-FILLET1_R * 0.288675134595, FILLET1_R * 0.5), (0, 0))
            Line((0, 0), (FILLET1_R * 0.57735026919, 0))
        make_face()
    extrude(amount=0.216905989, mode=Mode.SUBTRACT)
    with BuildSketch(Plane(origin=(0.12, 1.8575, -0.111547005), x_dir=(-1, 0, 0), z_dir=(0, 0, -1)), Plane(origin=(-0.12, 1.8575, -0.111547005), x_dir=(-0.5000000000000002, -0.8660254037844386, 0), z_dir=(0, 0, -1)), Plane(origin=(-0.108452995, -1.5175, 1.56), x_dir=(0, 0.49999999999998357, -0.8660254037844481), z_dir=(1, 0, 0)), Plane(origin=(-0.12, -1.745952995, 1.56), x_dir=(-0.5000000000000027, 3.023711536277452e-15, -0.8660254037844372), z_dir=(0, 1, 0)), Plane(origin=(0.12, -1.745952995, 1.56), x_dir=(-1, 0, 0), z_dir=(0, 1, 0))) as fillet1_piece_17:
        with BuildLine():
            CenterArc((FILLET1_R * 0.57735026919, -FILLET1_R), FILLET1_R, 90, 60)
            Line((-FILLET1_R * 0.288675134595, -FILLET1_R * 0.5), (0, 0))
            Line((0, 0), (FILLET1_R * 0.57735026919, 0))
        make_face()
    extrude(amount=0.216905989, mode=Mode.SUBTRACT)
    with BuildSketch(Plane(origin=(0.122309401, 1.8535, -0.342309401), x_dir=(-0.8944271909999167, -0.3872983346207399, -0.22360679774997883), z_dir=(0.4472135954999563, -0.7745966692414852, -0.4472135954999564)), Plane(origin=(-0.122309401, 1.8535, -0.342309401), x_dir=(-0.22360679774998504, -0.3872983346207364, 0.8944271909999166), z_dir=(-0.4472135954999562, -0.7745966692414853, -0.44721359549995643)), Plane(origin=(-0.122309401, -1.515190599, 1.556), x_dir=(-0.22360679774997835, -0.8944271909999151, -0.3872983346207441), z_dir=(-0.44721359549995615, 0.4472135954999597, -0.7745966692414834)), Plane(origin=(0.122309401, -1.515190599, 1.556), x_dir=(-0.8944271909999167, 0.2236067977499787, -0.3872983346207397), z_dir=(0.4472135954999561, 0.44721359549995976, -0.7745966692414834))) as fillet1_piece_18:
        with BuildLine():
            CenterArc((FILLET1_R * 0.774596669241, -FILLET1_R), FILLET1_R, 90, 75.522487814)
            Line((-FILLET1_R * 0.19364916731, -FILLET1_R * 0.75), (0, 0))
            Line((0, 0), (FILLET1_R * 0.774596669241, 0))
        make_face()
    extrude(amount=0.257172653, mode=Mode.SUBTRACT)
    with BuildSketch(Plane(origin=(0.122309401, 1.8535, -0.097690599), x_dir=(-0.8944271909999166, -0.3872983346207399, 0.22360679774997883), z_dir=(0.4472135954999564, -0.7745966692414853, 0.4472135954999563)), Plane(origin=(-0.122309401, 1.8535, -0.097690599), x_dir=(-0.22360679774998238, -0.3872983346207379, -0.8944271909999167), z_dir=(-0.44721359549995626, -0.7745966692414854, 0.4472135954999564)), Plane(origin=(-0.122309401, -1.759809401, 1.556), x_dir=(-0.22360679774997672, 0.8944271909999183, -0.38729833462073776), z_dir=(-0.44721359549995626, -0.44721359549995343, -0.774596669241487)), Plane(origin=(0.122309401, -1.759809401, 1.556), x_dir=(-0.8944271909999166, -0.22360679774999576, -0.3872983346207301), z_dir=(0.4472135954999564, -0.4472135954999535, -0.774596669241487))) as fillet1_piece_19:
        with BuildLine():
            CenterArc((FILLET1_R * 0.774596669241, FILLET1_R), FILLET1_R, 194.477512186, 75.522487814)
            Line((-FILLET1_R * 0.19364916731, FILLET1_R * 0.75), (0, 0))
            Line((0, 0), (FILLET1_R * 0.774596669241, 0))
        make_face()
    extrude(amount=0.257172653, mode=Mode.SUBTRACT)


solid = part.part
